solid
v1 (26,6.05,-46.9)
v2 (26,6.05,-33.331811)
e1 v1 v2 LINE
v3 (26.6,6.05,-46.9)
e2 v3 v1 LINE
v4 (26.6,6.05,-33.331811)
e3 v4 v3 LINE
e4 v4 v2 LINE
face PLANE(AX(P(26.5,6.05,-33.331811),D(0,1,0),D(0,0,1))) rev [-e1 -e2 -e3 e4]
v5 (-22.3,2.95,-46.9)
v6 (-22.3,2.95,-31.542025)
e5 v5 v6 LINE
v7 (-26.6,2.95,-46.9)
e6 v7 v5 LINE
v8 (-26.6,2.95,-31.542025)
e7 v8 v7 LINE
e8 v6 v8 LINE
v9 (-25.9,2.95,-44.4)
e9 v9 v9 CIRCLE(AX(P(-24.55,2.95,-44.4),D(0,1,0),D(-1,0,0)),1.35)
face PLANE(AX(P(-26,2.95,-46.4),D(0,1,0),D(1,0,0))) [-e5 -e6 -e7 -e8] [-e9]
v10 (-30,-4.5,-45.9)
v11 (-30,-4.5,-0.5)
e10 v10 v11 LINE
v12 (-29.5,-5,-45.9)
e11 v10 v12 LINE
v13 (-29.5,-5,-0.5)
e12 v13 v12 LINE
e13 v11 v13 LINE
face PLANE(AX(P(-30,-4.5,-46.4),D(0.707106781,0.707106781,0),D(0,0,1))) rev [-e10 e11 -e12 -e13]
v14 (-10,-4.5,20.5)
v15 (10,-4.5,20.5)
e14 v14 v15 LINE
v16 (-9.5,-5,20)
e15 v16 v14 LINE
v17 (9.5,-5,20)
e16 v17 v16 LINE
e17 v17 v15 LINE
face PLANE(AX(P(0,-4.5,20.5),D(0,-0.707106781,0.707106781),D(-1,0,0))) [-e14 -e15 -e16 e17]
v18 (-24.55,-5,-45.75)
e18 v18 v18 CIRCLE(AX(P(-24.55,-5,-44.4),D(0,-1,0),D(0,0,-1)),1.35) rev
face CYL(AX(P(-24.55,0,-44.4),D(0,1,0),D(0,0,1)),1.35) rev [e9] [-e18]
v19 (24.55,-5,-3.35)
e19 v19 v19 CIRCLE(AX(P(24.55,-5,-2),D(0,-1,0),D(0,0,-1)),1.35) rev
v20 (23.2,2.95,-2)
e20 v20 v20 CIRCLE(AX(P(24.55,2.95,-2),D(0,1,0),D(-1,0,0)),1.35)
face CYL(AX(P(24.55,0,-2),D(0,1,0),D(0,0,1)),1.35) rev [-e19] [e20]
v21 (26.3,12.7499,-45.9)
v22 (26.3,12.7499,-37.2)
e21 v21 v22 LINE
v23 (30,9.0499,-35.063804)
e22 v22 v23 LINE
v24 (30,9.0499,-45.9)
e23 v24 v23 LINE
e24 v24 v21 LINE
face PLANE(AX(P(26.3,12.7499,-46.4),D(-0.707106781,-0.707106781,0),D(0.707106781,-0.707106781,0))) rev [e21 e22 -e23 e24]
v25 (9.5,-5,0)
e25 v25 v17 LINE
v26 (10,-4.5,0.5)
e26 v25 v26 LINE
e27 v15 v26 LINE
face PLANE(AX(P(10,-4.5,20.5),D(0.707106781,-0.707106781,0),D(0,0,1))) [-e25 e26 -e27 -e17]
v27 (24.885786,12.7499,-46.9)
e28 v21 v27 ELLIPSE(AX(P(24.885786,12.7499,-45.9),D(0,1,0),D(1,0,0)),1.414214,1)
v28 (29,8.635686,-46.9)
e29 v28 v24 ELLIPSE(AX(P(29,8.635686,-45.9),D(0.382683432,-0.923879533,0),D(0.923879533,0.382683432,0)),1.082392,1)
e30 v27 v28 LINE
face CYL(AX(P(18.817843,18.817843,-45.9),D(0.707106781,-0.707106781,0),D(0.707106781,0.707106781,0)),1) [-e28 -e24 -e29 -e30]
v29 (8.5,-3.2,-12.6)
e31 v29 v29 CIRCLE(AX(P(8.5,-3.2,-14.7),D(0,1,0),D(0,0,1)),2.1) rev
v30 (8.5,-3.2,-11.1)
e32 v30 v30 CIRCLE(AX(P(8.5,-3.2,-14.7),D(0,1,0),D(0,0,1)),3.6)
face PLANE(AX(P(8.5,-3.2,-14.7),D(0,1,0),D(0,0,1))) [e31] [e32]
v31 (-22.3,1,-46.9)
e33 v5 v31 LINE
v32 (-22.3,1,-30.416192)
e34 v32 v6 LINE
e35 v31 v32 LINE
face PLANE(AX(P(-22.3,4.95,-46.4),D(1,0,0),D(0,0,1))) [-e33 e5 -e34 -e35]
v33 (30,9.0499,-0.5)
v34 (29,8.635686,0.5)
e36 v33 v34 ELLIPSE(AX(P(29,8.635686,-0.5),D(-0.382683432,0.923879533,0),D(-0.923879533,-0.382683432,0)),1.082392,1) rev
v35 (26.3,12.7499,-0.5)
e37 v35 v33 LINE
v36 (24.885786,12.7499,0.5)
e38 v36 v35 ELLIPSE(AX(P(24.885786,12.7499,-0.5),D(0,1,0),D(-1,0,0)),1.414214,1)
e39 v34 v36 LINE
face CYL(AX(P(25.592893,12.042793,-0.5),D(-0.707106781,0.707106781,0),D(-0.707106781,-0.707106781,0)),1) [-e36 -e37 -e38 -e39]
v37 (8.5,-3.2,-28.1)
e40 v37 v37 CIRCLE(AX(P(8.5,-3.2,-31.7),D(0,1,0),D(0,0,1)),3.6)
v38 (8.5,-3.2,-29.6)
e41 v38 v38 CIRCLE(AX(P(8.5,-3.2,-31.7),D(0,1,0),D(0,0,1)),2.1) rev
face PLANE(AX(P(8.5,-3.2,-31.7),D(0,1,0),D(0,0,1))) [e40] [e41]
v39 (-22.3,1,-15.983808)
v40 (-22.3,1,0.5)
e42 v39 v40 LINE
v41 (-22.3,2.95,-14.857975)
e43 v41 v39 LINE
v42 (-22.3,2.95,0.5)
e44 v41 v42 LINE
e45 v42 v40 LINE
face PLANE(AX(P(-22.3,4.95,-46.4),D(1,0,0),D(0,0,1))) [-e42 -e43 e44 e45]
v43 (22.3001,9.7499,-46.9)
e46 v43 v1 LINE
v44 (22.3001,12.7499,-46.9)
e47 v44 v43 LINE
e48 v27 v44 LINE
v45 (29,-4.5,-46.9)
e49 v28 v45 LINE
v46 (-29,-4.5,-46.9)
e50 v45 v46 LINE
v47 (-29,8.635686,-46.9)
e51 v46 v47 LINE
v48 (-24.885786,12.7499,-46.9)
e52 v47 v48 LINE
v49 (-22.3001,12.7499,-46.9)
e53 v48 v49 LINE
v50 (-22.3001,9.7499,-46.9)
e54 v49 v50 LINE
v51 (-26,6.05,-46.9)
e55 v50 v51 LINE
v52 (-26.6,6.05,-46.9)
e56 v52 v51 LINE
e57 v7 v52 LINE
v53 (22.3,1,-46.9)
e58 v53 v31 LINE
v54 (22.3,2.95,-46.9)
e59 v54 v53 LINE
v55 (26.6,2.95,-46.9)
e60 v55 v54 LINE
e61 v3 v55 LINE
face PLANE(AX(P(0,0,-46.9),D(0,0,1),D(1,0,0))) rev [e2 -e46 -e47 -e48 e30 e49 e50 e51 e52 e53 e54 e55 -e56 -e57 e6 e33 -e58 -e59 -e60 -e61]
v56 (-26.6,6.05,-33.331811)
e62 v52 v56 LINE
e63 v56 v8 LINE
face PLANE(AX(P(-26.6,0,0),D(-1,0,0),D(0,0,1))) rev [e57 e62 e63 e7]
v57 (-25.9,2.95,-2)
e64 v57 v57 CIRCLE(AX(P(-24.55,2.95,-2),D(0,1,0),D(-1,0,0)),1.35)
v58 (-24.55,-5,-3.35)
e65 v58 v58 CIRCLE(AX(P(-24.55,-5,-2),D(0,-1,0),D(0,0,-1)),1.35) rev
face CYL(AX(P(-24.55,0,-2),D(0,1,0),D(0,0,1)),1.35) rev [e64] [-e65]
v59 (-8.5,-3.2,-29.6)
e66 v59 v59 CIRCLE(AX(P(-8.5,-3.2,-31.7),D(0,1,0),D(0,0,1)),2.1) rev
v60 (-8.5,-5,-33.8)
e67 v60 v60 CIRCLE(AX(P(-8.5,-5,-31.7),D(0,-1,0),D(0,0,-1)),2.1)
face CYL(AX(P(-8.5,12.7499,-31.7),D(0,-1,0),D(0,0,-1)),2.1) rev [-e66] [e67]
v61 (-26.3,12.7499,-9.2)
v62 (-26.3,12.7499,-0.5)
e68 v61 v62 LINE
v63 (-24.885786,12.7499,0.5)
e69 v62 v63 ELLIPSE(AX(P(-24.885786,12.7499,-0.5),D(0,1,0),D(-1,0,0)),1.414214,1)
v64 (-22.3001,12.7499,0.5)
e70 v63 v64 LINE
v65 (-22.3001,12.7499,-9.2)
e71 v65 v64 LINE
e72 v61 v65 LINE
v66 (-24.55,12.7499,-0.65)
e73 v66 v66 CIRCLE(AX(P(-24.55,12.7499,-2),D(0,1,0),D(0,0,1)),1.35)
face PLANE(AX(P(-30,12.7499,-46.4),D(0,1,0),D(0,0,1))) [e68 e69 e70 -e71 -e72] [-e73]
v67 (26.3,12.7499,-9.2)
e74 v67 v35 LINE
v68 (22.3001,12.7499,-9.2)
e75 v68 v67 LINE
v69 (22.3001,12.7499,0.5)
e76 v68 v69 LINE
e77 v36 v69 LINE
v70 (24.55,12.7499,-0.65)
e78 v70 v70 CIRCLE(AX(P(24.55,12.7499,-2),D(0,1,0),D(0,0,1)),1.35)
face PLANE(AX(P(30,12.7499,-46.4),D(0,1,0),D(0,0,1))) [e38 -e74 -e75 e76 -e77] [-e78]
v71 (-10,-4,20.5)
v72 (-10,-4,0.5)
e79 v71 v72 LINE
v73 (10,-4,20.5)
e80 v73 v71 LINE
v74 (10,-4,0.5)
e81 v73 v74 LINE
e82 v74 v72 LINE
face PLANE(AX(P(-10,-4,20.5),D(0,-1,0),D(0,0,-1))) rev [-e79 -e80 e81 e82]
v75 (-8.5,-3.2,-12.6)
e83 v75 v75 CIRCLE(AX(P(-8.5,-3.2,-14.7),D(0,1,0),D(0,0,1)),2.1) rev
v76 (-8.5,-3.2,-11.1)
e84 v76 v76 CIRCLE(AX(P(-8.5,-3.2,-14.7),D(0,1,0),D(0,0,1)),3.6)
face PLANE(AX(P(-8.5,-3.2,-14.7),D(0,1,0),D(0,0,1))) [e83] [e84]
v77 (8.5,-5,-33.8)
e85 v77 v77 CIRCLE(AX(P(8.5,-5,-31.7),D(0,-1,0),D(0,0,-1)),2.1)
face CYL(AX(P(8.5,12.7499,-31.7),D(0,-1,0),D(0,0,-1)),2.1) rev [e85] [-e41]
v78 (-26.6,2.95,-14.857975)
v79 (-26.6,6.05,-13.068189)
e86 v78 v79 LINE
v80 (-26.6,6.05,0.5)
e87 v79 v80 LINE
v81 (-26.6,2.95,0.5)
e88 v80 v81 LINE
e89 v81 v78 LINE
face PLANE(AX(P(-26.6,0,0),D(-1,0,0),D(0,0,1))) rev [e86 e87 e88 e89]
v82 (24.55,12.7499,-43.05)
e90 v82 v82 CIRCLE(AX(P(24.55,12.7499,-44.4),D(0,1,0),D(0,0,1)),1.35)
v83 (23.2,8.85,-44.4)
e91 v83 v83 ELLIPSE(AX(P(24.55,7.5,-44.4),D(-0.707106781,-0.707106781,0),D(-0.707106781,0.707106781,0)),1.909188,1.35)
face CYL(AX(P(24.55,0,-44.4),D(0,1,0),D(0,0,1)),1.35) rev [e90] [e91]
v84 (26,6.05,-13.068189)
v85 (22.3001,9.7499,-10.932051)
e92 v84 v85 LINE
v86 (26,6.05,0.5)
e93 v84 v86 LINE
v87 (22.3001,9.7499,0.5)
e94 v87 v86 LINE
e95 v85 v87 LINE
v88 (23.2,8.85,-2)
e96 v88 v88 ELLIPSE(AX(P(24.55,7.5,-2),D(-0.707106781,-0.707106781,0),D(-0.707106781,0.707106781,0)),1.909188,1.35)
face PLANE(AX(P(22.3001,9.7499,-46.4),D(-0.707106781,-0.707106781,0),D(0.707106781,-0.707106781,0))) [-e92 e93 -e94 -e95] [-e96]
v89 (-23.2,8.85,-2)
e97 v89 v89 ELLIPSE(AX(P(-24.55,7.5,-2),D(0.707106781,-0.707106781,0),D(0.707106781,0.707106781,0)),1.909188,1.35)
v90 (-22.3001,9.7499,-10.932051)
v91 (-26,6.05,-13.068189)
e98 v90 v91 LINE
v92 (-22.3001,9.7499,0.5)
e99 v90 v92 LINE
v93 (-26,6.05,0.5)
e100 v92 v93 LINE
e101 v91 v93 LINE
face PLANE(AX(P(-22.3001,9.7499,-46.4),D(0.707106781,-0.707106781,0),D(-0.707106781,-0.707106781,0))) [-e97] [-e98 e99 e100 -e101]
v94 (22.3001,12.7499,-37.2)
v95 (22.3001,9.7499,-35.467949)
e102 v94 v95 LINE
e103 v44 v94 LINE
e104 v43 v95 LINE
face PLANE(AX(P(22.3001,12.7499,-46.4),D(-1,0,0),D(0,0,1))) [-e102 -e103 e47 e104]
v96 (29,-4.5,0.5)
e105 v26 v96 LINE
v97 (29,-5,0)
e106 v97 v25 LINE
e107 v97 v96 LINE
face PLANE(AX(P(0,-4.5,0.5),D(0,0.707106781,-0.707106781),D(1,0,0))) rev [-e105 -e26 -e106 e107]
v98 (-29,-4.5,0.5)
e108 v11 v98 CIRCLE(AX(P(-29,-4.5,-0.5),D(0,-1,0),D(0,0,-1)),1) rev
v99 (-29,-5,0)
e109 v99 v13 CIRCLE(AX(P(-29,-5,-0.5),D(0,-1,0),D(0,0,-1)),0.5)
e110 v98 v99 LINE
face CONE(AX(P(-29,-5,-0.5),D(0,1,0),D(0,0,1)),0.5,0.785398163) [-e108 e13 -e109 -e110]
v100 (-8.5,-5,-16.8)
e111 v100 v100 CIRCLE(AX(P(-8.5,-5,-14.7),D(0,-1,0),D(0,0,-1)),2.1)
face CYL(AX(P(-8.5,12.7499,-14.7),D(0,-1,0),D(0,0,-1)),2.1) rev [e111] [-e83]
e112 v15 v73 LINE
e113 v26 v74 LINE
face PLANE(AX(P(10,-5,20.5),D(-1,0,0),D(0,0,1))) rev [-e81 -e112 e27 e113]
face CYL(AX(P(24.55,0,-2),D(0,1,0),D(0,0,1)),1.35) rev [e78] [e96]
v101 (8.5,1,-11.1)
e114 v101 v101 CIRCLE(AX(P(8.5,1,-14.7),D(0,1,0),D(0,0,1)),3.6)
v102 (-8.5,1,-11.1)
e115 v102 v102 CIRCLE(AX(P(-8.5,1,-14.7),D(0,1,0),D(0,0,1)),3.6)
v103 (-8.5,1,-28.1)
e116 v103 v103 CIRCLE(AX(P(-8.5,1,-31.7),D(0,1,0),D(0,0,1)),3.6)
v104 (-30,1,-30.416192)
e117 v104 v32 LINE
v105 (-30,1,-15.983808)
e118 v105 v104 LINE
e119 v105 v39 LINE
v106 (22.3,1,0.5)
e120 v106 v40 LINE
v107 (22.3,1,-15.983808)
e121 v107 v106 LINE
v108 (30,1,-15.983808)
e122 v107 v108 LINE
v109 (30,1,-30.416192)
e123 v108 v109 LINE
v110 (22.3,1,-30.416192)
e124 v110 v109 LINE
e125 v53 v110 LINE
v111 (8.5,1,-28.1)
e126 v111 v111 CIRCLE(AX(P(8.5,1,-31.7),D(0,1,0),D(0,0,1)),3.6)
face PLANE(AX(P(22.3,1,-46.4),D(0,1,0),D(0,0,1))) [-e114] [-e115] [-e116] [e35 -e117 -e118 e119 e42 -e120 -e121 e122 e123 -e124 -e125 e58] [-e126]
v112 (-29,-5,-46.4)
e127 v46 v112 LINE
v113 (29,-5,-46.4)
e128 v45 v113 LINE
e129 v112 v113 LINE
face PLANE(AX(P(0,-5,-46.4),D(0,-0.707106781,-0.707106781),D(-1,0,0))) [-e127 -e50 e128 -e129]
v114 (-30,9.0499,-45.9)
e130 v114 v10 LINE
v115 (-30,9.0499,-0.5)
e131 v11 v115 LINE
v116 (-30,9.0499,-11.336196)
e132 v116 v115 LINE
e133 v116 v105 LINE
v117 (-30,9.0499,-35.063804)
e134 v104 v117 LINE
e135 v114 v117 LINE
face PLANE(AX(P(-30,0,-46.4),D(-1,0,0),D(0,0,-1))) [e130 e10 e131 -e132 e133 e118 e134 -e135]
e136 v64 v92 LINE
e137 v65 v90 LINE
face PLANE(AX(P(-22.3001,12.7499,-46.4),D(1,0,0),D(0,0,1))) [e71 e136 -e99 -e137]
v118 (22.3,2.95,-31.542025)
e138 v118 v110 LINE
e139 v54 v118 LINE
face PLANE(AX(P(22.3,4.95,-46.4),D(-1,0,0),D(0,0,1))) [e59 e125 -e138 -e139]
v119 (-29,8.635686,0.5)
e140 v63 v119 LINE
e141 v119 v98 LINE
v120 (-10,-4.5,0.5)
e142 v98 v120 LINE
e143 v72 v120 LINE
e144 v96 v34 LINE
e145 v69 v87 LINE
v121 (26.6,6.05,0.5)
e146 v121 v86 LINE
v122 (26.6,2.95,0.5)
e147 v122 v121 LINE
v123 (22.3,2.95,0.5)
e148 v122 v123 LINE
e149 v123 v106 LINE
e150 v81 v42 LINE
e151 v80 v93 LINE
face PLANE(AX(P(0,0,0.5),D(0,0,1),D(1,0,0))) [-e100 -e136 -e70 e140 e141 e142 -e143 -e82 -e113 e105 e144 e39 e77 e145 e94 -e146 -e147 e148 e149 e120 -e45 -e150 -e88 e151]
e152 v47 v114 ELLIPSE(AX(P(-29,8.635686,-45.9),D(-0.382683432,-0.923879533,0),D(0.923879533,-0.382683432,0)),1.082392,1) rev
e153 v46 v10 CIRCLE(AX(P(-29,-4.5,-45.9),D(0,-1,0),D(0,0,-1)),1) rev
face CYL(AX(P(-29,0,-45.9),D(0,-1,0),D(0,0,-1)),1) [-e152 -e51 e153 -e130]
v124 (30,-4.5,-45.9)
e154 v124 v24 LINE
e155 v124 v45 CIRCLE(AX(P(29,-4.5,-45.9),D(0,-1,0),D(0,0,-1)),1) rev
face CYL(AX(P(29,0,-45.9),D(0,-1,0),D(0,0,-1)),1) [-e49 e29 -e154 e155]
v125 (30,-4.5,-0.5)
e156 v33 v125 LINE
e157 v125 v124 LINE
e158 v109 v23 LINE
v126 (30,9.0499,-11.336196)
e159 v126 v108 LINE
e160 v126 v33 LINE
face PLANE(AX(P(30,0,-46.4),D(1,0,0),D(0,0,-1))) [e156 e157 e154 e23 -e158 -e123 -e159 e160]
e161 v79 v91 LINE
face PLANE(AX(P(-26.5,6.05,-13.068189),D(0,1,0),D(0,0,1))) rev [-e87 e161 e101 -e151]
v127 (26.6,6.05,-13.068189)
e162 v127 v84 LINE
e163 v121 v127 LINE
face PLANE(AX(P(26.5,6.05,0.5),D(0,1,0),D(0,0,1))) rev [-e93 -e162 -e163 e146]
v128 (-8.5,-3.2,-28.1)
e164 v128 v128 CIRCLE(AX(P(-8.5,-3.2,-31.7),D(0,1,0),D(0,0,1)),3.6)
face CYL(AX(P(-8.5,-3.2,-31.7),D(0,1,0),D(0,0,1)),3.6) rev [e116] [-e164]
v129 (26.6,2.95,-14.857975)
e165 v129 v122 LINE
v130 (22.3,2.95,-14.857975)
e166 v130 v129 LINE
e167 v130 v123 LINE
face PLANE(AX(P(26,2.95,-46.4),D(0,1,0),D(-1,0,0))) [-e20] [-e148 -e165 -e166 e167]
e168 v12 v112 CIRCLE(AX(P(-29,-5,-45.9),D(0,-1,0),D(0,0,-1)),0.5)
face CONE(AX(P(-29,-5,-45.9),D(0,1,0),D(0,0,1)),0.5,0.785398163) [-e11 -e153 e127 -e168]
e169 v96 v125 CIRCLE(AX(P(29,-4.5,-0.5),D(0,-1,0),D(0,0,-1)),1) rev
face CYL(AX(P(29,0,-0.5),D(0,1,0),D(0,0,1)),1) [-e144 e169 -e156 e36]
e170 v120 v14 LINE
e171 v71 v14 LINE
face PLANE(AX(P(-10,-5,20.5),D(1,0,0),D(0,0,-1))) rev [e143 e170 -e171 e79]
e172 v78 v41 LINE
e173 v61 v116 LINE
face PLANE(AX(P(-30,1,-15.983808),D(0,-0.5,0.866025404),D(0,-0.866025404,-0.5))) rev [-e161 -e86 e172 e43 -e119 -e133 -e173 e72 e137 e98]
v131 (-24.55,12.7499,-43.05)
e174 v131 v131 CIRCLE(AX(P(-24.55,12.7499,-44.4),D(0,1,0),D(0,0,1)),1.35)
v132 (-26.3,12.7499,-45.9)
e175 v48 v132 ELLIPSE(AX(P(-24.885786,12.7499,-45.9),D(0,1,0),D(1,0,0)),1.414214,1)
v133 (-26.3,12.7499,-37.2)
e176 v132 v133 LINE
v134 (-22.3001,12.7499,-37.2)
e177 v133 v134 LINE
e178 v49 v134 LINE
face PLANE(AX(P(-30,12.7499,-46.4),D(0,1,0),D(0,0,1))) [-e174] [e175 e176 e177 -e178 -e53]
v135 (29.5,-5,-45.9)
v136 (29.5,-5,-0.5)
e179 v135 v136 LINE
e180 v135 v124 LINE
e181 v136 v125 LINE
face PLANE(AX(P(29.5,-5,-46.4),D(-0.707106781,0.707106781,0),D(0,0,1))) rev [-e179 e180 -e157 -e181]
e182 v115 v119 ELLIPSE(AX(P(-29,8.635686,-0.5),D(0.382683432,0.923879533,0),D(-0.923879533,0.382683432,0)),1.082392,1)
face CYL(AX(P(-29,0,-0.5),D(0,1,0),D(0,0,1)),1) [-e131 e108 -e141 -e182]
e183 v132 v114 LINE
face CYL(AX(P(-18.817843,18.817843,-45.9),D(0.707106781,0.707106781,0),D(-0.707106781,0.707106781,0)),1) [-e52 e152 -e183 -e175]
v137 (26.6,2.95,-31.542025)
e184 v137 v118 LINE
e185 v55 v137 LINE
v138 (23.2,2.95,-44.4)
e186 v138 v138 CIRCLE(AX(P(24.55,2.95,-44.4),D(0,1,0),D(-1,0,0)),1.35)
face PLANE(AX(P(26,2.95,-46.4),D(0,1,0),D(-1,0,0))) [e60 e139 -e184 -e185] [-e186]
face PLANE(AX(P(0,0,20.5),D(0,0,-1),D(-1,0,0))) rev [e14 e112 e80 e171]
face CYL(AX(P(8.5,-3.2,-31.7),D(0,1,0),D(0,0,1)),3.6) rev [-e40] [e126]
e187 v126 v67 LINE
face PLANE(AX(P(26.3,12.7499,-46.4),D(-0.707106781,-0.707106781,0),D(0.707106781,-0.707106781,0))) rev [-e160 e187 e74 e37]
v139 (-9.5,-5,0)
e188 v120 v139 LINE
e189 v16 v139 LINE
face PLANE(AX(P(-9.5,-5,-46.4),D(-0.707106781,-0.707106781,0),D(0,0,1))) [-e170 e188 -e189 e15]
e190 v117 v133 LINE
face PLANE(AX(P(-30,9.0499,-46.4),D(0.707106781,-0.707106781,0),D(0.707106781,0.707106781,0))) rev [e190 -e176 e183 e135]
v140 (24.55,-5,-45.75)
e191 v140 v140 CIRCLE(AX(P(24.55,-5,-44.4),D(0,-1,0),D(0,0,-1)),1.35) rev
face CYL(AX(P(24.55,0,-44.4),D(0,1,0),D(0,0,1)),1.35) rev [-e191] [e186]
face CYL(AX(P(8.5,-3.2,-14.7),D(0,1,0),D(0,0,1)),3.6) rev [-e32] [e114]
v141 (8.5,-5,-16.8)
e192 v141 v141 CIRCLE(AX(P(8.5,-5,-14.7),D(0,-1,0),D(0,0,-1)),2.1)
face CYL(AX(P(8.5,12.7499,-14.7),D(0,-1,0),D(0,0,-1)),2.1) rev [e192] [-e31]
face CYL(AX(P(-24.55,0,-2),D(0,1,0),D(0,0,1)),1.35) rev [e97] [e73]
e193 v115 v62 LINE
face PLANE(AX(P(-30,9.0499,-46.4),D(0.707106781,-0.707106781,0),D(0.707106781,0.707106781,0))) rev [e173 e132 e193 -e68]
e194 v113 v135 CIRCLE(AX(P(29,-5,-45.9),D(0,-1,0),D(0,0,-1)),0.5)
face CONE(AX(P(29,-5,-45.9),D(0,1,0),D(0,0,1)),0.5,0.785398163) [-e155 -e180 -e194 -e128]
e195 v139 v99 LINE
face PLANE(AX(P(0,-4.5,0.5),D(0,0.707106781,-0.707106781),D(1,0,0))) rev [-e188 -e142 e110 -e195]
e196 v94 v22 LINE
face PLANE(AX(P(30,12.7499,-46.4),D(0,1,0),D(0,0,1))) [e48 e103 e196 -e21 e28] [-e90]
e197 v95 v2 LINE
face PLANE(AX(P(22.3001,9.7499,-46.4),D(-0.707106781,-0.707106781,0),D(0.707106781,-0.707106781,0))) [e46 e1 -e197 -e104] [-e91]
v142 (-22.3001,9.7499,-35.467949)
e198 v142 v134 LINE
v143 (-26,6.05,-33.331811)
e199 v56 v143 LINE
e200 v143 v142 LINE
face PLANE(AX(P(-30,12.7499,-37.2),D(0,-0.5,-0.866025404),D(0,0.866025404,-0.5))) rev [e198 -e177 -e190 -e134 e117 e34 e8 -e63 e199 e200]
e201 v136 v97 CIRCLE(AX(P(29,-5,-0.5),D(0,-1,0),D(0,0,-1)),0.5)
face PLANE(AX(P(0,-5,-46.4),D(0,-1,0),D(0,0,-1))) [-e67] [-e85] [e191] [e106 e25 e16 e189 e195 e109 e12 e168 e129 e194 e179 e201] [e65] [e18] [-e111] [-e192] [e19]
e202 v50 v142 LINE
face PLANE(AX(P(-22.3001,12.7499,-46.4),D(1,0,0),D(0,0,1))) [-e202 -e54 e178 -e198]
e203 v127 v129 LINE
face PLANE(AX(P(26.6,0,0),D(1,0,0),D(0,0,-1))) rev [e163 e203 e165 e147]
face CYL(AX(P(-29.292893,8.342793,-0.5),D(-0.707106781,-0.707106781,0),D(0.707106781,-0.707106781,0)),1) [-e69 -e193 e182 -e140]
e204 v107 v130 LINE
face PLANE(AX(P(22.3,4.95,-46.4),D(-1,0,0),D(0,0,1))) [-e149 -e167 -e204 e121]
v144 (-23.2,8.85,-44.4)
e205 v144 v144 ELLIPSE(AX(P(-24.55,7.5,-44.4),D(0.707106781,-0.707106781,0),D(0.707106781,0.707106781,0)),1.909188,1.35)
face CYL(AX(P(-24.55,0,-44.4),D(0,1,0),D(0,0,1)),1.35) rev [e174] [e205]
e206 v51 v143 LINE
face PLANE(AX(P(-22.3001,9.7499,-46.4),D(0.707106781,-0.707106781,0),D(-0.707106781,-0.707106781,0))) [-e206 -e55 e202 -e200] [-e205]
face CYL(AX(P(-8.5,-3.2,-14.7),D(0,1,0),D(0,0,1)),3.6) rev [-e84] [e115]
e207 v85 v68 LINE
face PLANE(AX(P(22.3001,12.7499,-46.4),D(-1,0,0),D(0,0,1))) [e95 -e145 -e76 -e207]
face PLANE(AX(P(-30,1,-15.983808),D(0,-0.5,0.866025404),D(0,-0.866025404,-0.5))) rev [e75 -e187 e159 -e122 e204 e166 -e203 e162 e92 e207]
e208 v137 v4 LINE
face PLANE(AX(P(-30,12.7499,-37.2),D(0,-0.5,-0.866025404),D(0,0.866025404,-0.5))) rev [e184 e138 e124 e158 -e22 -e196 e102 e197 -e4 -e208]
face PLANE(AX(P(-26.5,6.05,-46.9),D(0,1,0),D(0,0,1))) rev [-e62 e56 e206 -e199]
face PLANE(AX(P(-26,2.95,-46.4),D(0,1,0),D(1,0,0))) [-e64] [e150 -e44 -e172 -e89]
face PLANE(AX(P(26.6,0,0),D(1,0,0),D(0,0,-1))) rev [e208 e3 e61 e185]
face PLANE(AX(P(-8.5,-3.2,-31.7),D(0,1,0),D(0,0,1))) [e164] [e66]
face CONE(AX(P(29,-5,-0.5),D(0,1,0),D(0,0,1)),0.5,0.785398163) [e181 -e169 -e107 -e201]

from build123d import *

# Parameters (mm, degrees)
BOSS_EXTRUDE1_DEPTH    = 46.39999966
SKETCH2_R              = 1.3500000000000056
SKETCH2_R_2            = 1.3500000000000065
SKETCH2_R_3            = 1.3500000000000034
CUT_EXTRUDE1_DEPTH     = 57.705554564416346
CUT_EXTRUDE2_DEPTH     = 57.705554564416346
CUT_EXTRUDE3_DEPTH     = 77.91241719292147
MOVE_FACE1_BY          = 0.5
MOVE_FACE1_2_BY        = 0.5
CUT_EXTRUDE5_DEPTH     = 0.5
CUT_EXTRUDE6_DEPTH     = 0.5
MOVE_START             = 2.95
MOVE_FACE2_OUTLINE_W   = 4.200000000000003
MOVE_FACE2_OUTLINE_H   = 47.399999660000006
MOVE_FACE2_OUTLINE_R   = 1.35
MOVE_FACE2_DEPTH       = 2
MOVE_FACE3_BY          = 2
MOVE_FACE4_BY          = 0.1
MOVE_FACE4_2_BY        = 0.1
MOVE_FACE4_3_BY        = 0.1
MOVE_FACE4_4_BY        = 0.1
SKETCH14_W             = 31.645569847246712
SKETCH14_H             = 25
BOSS_EXTRUDE4_DEPTH    = 4
SKETCH15_R             = 2.0999999999999974
SKETCH15_R_2           = 2.100000000000001
CUT_EXTRUDE9_DEPTH     = 59.74664856924181
SKETCH16_R             = 3.599999999999999
SKETCH16_R_2           = 3.600000000000001
SKETCH16_R_3           = 3.5999999999999996
CUT_EXTRUDE10_DEPTH    = 4.2
MOVE_START_2           = -6
MOVE_FACE5_OUTLINE_W   = 60.00000000000001
MOVE_FACE5_OUTLINE_H   = 47.399999660000006
MOVE_FACE5_OUTLINE_R   = 1.35
MOVE_FACE5_OUTLINE_W_2 = 31.645569848
MOVE_FACE5_OUTLINE_H_2 = 25.000000000000004
MOVE_FACE5_DEPTH       = 4
MOVE_FACE6_OUTLINE_W   = 60.00000000000001
MOVE_FACE6_OUTLINE_H   = 47.399999660000006
MOVE_FACE6_OUTLINE_R   = 1.35
MOVE_FACE6_OUTLINE_R_2 = 2.1
MOVE_FACE6_DEPTH       = 1
FILLET1_R              = 1
SKETCH18_W             = 20
SKETCH18_H             = 1
BOSS_EXTRUDE5_DEPTH    = 20
CHAMFER1_SIZE          = 0.5


# Read off the part's stored shape, not the designer's step: Move Face2, Move Face5, Move Face6
with BuildPart() as part:
    # Sketch1 → Boss-Extrude1 (new body)
    with BuildSketch(Plane.XY):
        Polygon((0, 0), (30.000000000000004, 0), (30.000000000000004, 12.749899999999984), (22.300099999999997, 12.749899999999984), (22.300099999999997, 9.749899999999984), (26, 6.050000000000002), (26, 4.950000000000001), (22.3, 4.95), (22.3, 1), (0, 1), align=None)
    extrude(amount=-BOSS_EXTRUDE1_DEPTH)

    # Mirror1: part across plane


with BuildPart() as part_1:
    add(part.part)
    add(part.part.mirror(Plane(origin=(0, 1, -46.39999966), x_dir=(0, 0, 1), z_dir=(-1, 0, 0))))

    # Sketch2 → Cut-Extrude1 (cut, through all)
    with BuildSketch(Plane(origin=(0, 12.749899999999984, 0), x_dir=(1, 0, 0), z_dir=(0, 1, 0))):
        with Locations(Location((-24.54999983142516, 1.9999999985748345, 0), (0, 0, 270))):
            Circle(SKETCH2_R)
        with Locations(Location((-24.54999983142517, 44.39999966142516, 0), (0, 0, 270))):
            Circle(SKETCH2_R_2)
        with Locations(Location((24.54999983142517, 1.9999999985748345, 0), (0, 0, 270))):
            Circle(SKETCH2_R)
        with Locations(Location((24.54999983142515, 44.39999966142516, 0), (0, 0, 270))):
            Circle(SKETCH2_R_3)
    extrude(amount=-CUT_EXTRUDE1_DEPTH, mode=Mode.SUBTRACT)

    # Sketch3 → Cut-Extrude2 (cut, through all)
    with BuildSketch(Plane.XY):
        Polygon((26.300000000000004, 12.749899999999984), (30.000000000000004, 9.049899999999985), (30.000000000000004, 12.749899999999984), align=None)
        Polygon((-30.000000000000004, 12.749899999999984), (-30.000000000000004, 9.049899999999981), (-26.300000000000004, 12.749899999999984), align=None)
    extrude(amount=-CUT_EXTRUDE2_DEPTH, mode=Mode.SUBTRACT)

    # Sketch4 → Cut-Extrude3 (cut, through all)
    with BuildSketch(Plane(origin=(30.000000000000004, 0, 0), x_dir=(0, 0, -1), z_dir=(1, 0, 0))):
        Polygon((9.199999829999998, 12.749899999999986), (37.199999829999996, 12.749899999999997), (30.41619190204875, 1.0000000000000036), (15.983807757951256, 0.9999999999999983), align=None)
    extrude(amount=-CUT_EXTRUDE3_DEPTH, mode=Mode.SUBTRACT)

    # Move Face1: a face moved outward by 0.5
    extrude(part_1.faces().sort_by_distance((-24, 3.187475, -46.39999966))[0], amount=MOVE_FACE1_BY, dir=(0, 0, -1))

    # Move Face1 2: a face moved outward by 0.5
    extrude(part_1.faces().sort_by_distance((-24, 3.187475, 0))[0], amount=MOVE_FACE1_2_BY, dir=(0, 0, 1))

    # Sketch6 → Cut-Extrude5 (cut)
    with BuildSketch(Plane(origin=(-26, 0, 0), x_dir=(0, 0, -1), z_dir=(1, 0, 0))):
        Polygon((13.703274194652213, 4.950000000000001), (13.068188898543607, 6.050000000000002), (-0.5000000000000004, 6.050000000000002), (-0.5000000000000004, 4.950000000000001), align=None)
        Polygon((33.33181076145639, 6.050000000000002), (32.69672546534779, 4.950000000000002), (46.89999966, 4.950000000000001), (46.89999966, 6.050000000000002), align=None)
    extrude(amount=-CUT_EXTRUDE5_DEPTH, mode=Mode.SUBTRACT)

    # Sketch7 → Cut-Extrude6 (cut)
    with BuildSketch(Plane.ZY.offset(-26)):
        Polygon((-13.068188898543607, 6.050000000000002), (-13.703274194652213, 4.950000000000001), (0.5000000000000004, 4.950000000000001), (0.5000000000000004, 6.050000000000002), align=None)
        Polygon((-32.69672546534779, 4.950000000000002), (-33.33181076145639, 6.050000000000002), (-46.89999966, 6.050000000000002), (-46.89999966, 4.950000000000001), align=None)
    extrude(amount=-CUT_EXTRUDE6_DEPTH, mode=Mode.SUBTRACT)

    # Move Face2 outline → Move Face2 (cut)
    # profile 1 of 2: a face of its own
    with BuildSketch(Plane(origin=(0, 0, 0), x_dir=(1, 0, 0), z_dir=(0, 1, 0)).offset(MOVE_START)):
        with Locations((-24.400000000000002, 23.199999830000003)):
            Rectangle(MOVE_FACE2_OUTLINE_W, MOVE_FACE2_OUTLINE_H)
        with Locations((-24.549999831, 1.999999999)):
            Circle(MOVE_FACE2_OUTLINE_R, mode=Mode.SUBTRACT)
        with Locations((-24.549999831, 44.399999661)):
            Circle(MOVE_FACE2_OUTLINE_R, mode=Mode.SUBTRACT)
    # profile 2 of 2: a face of its own
    with BuildSketch(Plane(origin=(0, 0, 0), x_dir=(1, 0, 0), z_dir=(0, 1, 0)).offset(MOVE_START)):
        with Locations((24.400000000000002, 23.199999830000003)):
            Rectangle(MOVE_FACE2_OUTLINE_W, MOVE_FACE2_OUTLINE_H)
        with Locations((24.549999831, 1.999999999)):
            Circle(MOVE_FACE2_OUTLINE_R, mode=Mode.SUBTRACT)
        with Locations((24.549999831, 44.399999661)):
            Circle(MOVE_FACE2_OUTLINE_R, mode=Mode.SUBTRACT)
    extrude(amount=MOVE_FACE2_DEPTH, mode=Mode.SUBTRACT)

    # Move Face3: a face moved outward by 2.0
    extrude(part_1.faces().sort_by_distance((0, 0, -23.19999983))[0], amount=MOVE_FACE3_BY, dir=(0, -1, 0))

    # Move Face4: a face moved inward by 0.1
    extrude(part_1.faces().sort_by_distance((-26.5, 4.468031617, -6.740769385))[0], amount=MOVE_FACE4_BY, dir=(-1, 0, 0), mode=Mode.SUBTRACT)

    # Move Face4 2: a face moved inward by 0.1
    extrude(part_1.faces().sort_by_distance((-26.5, 4.468031617, -39.659230275))[0], amount=MOVE_FACE4_2_BY, dir=(-1, 0, 0), mode=Mode.SUBTRACT)

    # Move Face4 3: a face moved inward by 0.1
    extrude(part_1.faces().sort_by_distance((26.5, 4.468031617, -6.740769385))[0], amount=MOVE_FACE4_3_BY, dir=(1, 0, 0), mode=Mode.SUBTRACT)

    # Move Face4 4: a face moved inward by 0.1
    extrude(part_1.faces().sort_by_distance((26.5, 4.468031617, -39.659230275))[0], amount=MOVE_FACE4_4_BY, dir=(1, 0, 0), mode=Mode.SUBTRACT)

    # Sketch14 → Boss-Extrude4 (add)
    with BuildSketch(Plane.XZ.offset(1.9999999999999996)):
        with Locations((-1.78e-15, -23.199999829999996)):
            Rectangle(SKETCH14_W, SKETCH14_H)
    extrude(amount=BOSS_EXTRUDE4_DEPTH)

    # Sketch15 → Cut-Extrude9 (cut, through all)
    with BuildSketch(Plane.XZ.offset(6)):
        with Locations(Location((-8.5, -14.699999829999992, 0), (0, 0, 270))):
            Circle(SKETCH15_R)
        with Locations(Location((8.5, -14.699999829999992, 0), (0, 0, 270))):
            Circle(SKETCH15_R)
        with Locations(Location((8.500000000000002, -31.699999829999992, 0), (0, 0, 270))):
            Circle(SKETCH15_R_2)
        with Locations(Location((-8.500000000000002, -31.699999829999992, 0), (0, 0, 270))):
            Circle(SKETCH15_R_2)
    extrude(amount=-CUT_EXTRUDE9_DEPTH, mode=Mode.SUBTRACT)

    # Sketch16 → Cut-Extrude10 (cut)
    with BuildSketch(Plane(origin=(0, 1, 0), x_dir=(1, 0, 0), z_dir=(0, 1, 0))):
        with Locations(Location((-8.500000000000002, 31.699999829999992, 0), (0, 0, 270))):
            Circle(SKETCH16_R)
        with Locations(Location((8.500000000000002, 31.699999829999992, 0), (0, 0, 270))):
            Circle(SKETCH16_R_2)
        with Locations(Location((8.5, 14.699999829999992, 0), (0, 0, 270))):
            Circle(SKETCH16_R_3)
        with Locations(Location((-8.5, 14.699999829999992, 0), (0, 0, 270))):
            Circle(SKETCH16_R_3)
    extrude(amount=-CUT_EXTRUDE10_DEPTH, mode=Mode.SUBTRACT)

    # Move Face5 outline → Move Face5 (add)
    with BuildSketch(Plane(origin=(0, 0, 0), x_dir=(1, 0, 0), z_dir=(0, 1, 0)).offset(MOVE_START_2)):
        with Locations((0, 23.199999830000003)):
            Rectangle(MOVE_FACE5_OUTLINE_W, MOVE_FACE5_OUTLINE_H)
        with Locations((-24.549999831, 1.999999999)):
            Circle(MOVE_FACE5_OUTLINE_R, mode=Mode.SUBTRACT)
        with Locations((24.549999831, 1.999999999)):
            Circle(MOVE_FACE5_OUTLINE_R, mode=Mode.SUBTRACT)
        with Locations((-24.549999831, 44.399999661)):
            Circle(MOVE_FACE5_OUTLINE_R, mode=Mode.SUBTRACT)
        with Locations((0, 23.199999830000003)):
            Rectangle(MOVE_FACE5_OUTLINE_W_2, MOVE_FACE5_OUTLINE_H_2, mode=Mode.SUBTRACT)
        with Locations((24.549999831, 44.399999661)):
            Circle(MOVE_FACE5_OUTLINE_R, mode=Mode.SUBTRACT)
    extrude(amount=MOVE_FACE5_DEPTH)

    # Move Face6 outline → Move Face6 (cut)
    with BuildSketch(Plane(origin=(0, 0, 0), x_dir=(1, 0, 0), z_dir=(0, 1, 0)).offset(MOVE_START_2)):
        with Locations((0, 23.199999830000003)):
            Rectangle(MOVE_FACE6_OUTLINE_W, MOVE_FACE6_OUTLINE_H)
        with Locations((-24.549999831, 1.999999999)):
            Circle(MOVE_FACE6_OUTLINE_R, mode=Mode.SUBTRACT)
        with Locations((-8.5, 14.69999983)):
            Circle(MOVE_FACE6_OUTLINE_R_2, mode=Mode.SUBTRACT)
        with Locations((24.549999831, 1.999999999)):
            Circle(MOVE_FACE6_OUTLINE_R, mode=Mode.SUBTRACT)
        with Locations((8.5, 14.69999983)):
            Circle(MOVE_FACE6_OUTLINE_R_2, mode=Mode.SUBTRACT)
        with Locations((-8.5, 31.69999983)):
            Circle(MOVE_FACE6_OUTLINE_R_2, mode=Mode.SUBTRACT)
        with Locations((-24.549999831, 44.399999661)):
            Circle(MOVE_FACE6_OUTLINE_R, mode=Mode.SUBTRACT)
        with Locations((8.5, 31.69999983)):
            Circle(MOVE_FACE6_OUTLINE_R_2, mode=Mode.SUBTRACT)
        with Locations((24.549999831, 44.399999661)):
            Circle(MOVE_FACE6_OUTLINE_R, mode=Mode.SUBTRACT)
    extrude(amount=MOVE_FACE6_DEPTH, mode=Mode.SUBTRACT)

    # Fillet1
    fillet1_edges = [part_1.edges().sort_by_distance(p)[0] for p in [
        (30.000000000000004, 2.0249499999999934, -46.89999966),
        (30.000000000000004, 2.0249499999999934, 0.5),
        (-30.000000000000004, 2.0249499999999907, 0.5),
        (-30.000000000000004, 2.02494999999999, -46.89999966),
        (28.150000000000006, 10.899899999999985, -46.899999660000006),
        (28.150000000000006, 10.899899999999985, 0.5),
        (-28.150000000000006, 10.899899999999983, -46.899999660000006),
        (-28.150000000000006, 10.899899999999983, 0.5),
    ]]
    fillet(fillet1_edges, radius=FILLET1_R)

    # Sketch18 → Boss-Extrude5 (add)
    with BuildSketch(Plane.XY.offset(0.5)):
        with Locations((0, -4.499999999999998)):
            Rectangle(SKETCH18_W, SKETCH18_H)
    extrude(amount=BOSS_EXTRUDE5_DEPTH)

    # Chamfer1
    chamfer1_edges = [part_1.edges().sort_by_distance(p)[0] for p in [
        (30, -5, -23.19999983),
        (0, -5, -46.89999966),
        (-19.5, -5, 0.5),
        (-30, -5, -23.19999983),
        (-29.707106781186546, -5, -46.607106441186545),
        (-29.707106781186543, -5, 0.20710678118654768),
        (29.707106781186546, -5, 0.20710678118654768),
        (29.707106781186546, -5, -46.607106441186545),
        (-10, -4.999999999999998, 10.5),
        (10, -4.999999999999998, 10.5),
        (0, -4.999999999999998, 20.5),
    ]]
    chamfer(chamfer1_edges, length=CHAMFER1_SIZE)


solid = part_1.part
